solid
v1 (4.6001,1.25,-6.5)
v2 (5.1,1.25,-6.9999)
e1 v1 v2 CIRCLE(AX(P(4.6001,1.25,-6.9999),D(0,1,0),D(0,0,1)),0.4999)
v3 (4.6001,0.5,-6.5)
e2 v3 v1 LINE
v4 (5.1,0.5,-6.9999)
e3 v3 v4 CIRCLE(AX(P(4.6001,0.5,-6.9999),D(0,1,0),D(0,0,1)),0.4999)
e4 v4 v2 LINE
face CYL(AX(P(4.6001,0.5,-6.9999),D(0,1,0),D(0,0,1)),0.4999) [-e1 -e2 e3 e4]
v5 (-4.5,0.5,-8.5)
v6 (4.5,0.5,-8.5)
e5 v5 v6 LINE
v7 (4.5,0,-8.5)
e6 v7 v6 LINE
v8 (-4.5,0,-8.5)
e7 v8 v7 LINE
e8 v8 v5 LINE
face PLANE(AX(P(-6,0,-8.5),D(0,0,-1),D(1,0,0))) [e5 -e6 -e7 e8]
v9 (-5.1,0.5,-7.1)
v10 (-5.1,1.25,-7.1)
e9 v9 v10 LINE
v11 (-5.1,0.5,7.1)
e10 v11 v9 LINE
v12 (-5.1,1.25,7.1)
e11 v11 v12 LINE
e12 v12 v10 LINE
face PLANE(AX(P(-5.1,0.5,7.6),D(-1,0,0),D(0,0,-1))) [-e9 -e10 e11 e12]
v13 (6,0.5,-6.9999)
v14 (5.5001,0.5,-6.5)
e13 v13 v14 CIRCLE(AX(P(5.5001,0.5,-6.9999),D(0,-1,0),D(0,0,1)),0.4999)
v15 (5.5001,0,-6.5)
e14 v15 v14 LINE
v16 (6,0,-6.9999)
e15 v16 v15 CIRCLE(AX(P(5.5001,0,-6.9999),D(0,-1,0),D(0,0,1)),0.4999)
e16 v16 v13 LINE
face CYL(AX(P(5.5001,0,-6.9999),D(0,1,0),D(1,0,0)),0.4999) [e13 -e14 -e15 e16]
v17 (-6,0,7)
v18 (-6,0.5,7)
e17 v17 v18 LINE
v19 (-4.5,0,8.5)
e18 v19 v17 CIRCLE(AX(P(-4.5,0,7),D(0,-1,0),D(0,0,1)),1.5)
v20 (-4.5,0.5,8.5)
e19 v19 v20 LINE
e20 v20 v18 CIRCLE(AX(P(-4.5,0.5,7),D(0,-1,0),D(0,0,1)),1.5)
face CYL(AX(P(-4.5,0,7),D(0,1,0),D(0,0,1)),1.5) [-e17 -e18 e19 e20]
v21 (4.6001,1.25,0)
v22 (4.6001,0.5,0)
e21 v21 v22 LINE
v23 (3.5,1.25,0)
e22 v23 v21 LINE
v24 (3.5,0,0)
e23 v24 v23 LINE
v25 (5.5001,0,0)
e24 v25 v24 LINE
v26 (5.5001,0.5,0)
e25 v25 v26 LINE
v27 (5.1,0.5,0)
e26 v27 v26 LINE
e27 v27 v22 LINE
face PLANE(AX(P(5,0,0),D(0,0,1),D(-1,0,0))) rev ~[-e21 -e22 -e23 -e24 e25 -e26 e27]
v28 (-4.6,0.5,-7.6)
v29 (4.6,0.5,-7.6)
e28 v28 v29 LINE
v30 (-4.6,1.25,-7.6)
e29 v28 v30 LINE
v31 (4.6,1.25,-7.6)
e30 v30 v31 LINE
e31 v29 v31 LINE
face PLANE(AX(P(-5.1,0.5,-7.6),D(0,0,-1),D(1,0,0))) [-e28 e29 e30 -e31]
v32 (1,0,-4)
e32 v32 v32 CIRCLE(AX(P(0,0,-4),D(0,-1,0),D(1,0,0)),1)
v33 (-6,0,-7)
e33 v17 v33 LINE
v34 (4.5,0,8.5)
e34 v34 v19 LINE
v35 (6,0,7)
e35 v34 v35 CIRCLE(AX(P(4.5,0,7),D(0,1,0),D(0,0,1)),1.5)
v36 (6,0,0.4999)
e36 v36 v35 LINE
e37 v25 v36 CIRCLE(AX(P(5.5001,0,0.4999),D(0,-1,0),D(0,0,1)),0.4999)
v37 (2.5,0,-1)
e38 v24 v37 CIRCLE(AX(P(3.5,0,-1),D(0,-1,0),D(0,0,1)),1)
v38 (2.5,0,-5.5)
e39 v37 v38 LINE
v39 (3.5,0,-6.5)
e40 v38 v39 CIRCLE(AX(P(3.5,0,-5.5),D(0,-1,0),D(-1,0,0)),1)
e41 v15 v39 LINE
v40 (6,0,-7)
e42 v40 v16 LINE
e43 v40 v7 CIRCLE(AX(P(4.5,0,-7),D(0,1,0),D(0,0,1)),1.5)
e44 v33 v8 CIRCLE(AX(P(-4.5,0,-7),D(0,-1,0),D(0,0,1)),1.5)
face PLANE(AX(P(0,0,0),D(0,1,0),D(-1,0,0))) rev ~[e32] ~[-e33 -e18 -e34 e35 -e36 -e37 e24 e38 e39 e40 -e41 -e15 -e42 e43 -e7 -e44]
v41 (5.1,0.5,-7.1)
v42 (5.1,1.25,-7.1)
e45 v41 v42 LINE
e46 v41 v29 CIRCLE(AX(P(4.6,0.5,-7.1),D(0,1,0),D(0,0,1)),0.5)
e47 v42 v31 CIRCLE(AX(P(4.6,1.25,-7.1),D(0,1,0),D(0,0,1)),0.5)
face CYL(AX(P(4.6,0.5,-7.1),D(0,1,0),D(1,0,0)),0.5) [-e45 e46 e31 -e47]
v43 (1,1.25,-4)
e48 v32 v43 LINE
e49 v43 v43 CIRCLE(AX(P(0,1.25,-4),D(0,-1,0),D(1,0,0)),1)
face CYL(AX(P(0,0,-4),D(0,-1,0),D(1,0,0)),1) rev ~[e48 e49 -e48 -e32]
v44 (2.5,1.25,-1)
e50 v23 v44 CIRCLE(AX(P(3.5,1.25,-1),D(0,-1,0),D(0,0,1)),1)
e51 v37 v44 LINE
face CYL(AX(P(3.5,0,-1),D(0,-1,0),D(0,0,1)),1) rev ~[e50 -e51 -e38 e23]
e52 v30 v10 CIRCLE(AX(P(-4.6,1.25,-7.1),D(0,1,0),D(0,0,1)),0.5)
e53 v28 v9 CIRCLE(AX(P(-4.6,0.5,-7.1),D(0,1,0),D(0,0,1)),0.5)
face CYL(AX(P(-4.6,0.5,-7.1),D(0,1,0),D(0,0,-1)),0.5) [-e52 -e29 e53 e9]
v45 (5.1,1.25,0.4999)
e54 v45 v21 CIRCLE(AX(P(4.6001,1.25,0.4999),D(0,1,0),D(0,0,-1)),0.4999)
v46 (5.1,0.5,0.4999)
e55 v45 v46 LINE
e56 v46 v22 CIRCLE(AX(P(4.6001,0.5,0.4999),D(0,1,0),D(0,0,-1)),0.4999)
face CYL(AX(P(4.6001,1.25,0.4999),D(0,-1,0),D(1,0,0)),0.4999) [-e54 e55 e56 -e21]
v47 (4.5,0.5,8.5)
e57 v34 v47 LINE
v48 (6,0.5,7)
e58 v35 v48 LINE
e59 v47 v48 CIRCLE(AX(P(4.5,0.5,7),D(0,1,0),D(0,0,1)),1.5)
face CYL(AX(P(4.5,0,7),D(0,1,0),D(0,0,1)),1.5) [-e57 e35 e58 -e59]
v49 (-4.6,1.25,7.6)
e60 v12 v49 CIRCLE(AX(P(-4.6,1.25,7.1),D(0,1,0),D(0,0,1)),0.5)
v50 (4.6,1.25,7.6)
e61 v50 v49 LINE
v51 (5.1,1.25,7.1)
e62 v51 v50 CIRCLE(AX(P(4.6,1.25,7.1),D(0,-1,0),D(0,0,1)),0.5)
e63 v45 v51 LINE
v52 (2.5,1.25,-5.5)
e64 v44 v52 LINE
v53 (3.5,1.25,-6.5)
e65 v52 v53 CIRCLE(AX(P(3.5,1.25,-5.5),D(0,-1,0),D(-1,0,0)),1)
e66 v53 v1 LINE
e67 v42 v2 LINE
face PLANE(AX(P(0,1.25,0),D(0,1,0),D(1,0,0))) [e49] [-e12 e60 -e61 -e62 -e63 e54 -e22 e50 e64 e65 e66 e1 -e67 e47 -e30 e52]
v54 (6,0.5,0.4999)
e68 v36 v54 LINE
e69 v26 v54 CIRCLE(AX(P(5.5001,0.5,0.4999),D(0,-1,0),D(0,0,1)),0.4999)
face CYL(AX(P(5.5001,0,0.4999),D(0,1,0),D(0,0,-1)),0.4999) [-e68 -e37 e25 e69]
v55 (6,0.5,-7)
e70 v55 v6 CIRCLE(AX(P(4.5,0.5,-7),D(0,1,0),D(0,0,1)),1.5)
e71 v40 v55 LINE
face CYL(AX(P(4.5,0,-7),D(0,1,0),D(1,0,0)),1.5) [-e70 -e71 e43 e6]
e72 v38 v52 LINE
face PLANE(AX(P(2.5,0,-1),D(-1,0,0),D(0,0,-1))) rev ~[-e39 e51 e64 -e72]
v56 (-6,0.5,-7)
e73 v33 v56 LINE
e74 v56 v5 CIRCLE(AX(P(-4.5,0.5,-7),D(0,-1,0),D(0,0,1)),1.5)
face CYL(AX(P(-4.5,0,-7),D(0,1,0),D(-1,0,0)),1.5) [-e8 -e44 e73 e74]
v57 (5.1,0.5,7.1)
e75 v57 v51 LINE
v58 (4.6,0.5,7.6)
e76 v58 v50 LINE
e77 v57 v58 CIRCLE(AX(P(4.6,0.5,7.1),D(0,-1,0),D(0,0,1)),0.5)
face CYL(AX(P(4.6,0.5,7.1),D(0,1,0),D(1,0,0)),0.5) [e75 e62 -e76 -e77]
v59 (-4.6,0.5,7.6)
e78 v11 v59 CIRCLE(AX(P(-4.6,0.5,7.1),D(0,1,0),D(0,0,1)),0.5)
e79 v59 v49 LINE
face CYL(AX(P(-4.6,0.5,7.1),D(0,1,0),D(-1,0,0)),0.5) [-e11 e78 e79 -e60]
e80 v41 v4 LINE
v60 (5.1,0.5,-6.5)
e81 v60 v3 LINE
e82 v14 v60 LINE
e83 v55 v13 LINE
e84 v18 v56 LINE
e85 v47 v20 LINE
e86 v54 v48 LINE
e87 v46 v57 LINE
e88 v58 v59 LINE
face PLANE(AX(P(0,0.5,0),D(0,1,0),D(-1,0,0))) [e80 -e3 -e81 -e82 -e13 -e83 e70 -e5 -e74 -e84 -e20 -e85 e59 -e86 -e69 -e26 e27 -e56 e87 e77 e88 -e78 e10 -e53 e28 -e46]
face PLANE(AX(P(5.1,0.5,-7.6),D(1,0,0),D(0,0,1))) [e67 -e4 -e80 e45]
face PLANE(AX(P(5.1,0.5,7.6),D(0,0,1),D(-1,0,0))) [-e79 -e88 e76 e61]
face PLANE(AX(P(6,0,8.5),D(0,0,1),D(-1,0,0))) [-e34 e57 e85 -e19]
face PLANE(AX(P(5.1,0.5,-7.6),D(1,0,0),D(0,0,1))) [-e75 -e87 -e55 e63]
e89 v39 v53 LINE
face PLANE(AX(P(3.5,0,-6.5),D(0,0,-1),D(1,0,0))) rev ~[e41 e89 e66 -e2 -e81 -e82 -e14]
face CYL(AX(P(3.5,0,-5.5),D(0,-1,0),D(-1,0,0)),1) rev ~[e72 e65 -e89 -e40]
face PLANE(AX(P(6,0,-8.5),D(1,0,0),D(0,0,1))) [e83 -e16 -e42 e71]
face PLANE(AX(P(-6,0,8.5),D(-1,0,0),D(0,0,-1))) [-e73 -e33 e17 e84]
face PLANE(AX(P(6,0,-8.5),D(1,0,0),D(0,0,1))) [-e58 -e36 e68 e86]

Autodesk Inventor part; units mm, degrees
ref_plane "YZ Plane" through (0, 0, 0) normal (1, 0, 0) x (0, 1, 0)
ref_plane "XZ Plane" through (0, 0, 0) normal (0, 1, 0) x (-1, 0, 0)
ref_plane "XY Plane" through (0, 0, 0) normal (0, 0, 1) x (1, 0, 0)
sketch "Sketch1" plane through (0, 0, 0) normal (0, 1, 0) x (-1, 0, 0)
  line L0 (-6, 8.5) -> (6, 8.5)
  line L1 (6, 8.5) -> (6, -8.5)
  line L2 (6, -8.5) -> (-6, -8.5)
  line L3 (-6, -8.5) -> (-6, 8.5)
  line L4 (-6, 8.5) -> (6, -8.5) construction
  line L5 (6, 8.5) -> (-6, -8.5) construction
  point P0 (0, 0)
  dimension "d0" = 12
  dimension "d1" = 17
extrude "Extrusion1" add sketch "Sketch1" along normal blind 0.5
sketch "Sketch2" plane through (0, 0.5, 0) normal (0, 1, 0) x (1, 0, 0)
  line L0 (5.1, -7.6) -> (-5.1, -7.6)
  line L1 (-5.1, -7.6) -> (-5.1, 7.6)
  line L2 (-5.1, 7.6) -> (5.1, 7.6)
  line L3 (5.1, 7.6) -> (5.1, -7.6)
  line L4 (5.1, -7.6) -> (-5.1, 7.6) construction
  line L5 (-5.1, -7.6) -> (5.1, 7.6) construction
  point P0 (0, 0)
  dimension "d4" = 15.2
  dimension "d5" = 10.2
extrude "Extrusion2" add sketch "Sketch2" along normal blind 0.75
fillet "Fillet1" radius 1.5 4 edges at (-6, 0.25, 8.5) (6, 0.25, 8.5) (6, 0.25, -8.5) (-6, 0.25, -8.5)
fillet "Fillet2" radius 0.5 4 edges at (5.1, 0.875, -7.6) (-5.1, 0.875, -7.6) (-5.1, 0.875, 7.6) (5.1, 0.875, 7.6)
sketch "Sketch3" plane through (0, 0, 0) normal (0, -1, 0) x (1, 0, 0)
  line L0 (5, 0) -> (3.5, 0)
  line L1 (2.5, -1) -> (2.5, -5.5)
  line L2 (3.5, -6.5) -> (5, -6.5)
  line L3 (5, -6.5) -> (5, 0)
  line L4 (5, 0) -> (8.5853, 0)
  line L5 (8.5853, 0) -> (8.5853, -6.5)
  line L6 (8.5853, -6.5) -> (5, -6.5)
  line L7 (5, -6.5) -> (5, 0)
  line L8 (4.5, -8.5) -> (-4.5, -8.5) projected
  line L9 (6, 7) -> (6, -7) projected
  circle A0 centre (0, -4) radius 1
  line L10 (-6, -7) -> (-6, 7) projected
  arc A1 (3.5, 0) -> (2.5, -1) centre (3.5, -1) ccw
  arc A2 (2.5, -5.5) -> (3.5, -6.5) centre (3.5, -5.5) ccw
  point P0 (0, 0)
  point P1 (2.5, -6.5)
  point P2 (6, -6.5)
  point P3 (6, 0)
  dimension "d10" = 6.5
  dimension "d11" = 2.5
  dimension "d12" = 2
  dimension "d13" = 3.5
  dimension "d14" = 6
  dimension "d15" = 4.5
  dimension "d16" = 2
  dimension "d17" = 1
extrude "Extrusion3" cut sketch "Sketch3" against normal up to surface (1.25 mm away) contours L3 L2 A2 L1 A1 L0 | L4 L9 L6 L3 | A0
fillet "Fillet3" radius 0.5 4 edges at (5.1, 0.875, 0) (5.1, 0.875, -6.5) (6, 0.25, -6.5) (6, 0.25, 0)
properties part number "proxima_cup"
